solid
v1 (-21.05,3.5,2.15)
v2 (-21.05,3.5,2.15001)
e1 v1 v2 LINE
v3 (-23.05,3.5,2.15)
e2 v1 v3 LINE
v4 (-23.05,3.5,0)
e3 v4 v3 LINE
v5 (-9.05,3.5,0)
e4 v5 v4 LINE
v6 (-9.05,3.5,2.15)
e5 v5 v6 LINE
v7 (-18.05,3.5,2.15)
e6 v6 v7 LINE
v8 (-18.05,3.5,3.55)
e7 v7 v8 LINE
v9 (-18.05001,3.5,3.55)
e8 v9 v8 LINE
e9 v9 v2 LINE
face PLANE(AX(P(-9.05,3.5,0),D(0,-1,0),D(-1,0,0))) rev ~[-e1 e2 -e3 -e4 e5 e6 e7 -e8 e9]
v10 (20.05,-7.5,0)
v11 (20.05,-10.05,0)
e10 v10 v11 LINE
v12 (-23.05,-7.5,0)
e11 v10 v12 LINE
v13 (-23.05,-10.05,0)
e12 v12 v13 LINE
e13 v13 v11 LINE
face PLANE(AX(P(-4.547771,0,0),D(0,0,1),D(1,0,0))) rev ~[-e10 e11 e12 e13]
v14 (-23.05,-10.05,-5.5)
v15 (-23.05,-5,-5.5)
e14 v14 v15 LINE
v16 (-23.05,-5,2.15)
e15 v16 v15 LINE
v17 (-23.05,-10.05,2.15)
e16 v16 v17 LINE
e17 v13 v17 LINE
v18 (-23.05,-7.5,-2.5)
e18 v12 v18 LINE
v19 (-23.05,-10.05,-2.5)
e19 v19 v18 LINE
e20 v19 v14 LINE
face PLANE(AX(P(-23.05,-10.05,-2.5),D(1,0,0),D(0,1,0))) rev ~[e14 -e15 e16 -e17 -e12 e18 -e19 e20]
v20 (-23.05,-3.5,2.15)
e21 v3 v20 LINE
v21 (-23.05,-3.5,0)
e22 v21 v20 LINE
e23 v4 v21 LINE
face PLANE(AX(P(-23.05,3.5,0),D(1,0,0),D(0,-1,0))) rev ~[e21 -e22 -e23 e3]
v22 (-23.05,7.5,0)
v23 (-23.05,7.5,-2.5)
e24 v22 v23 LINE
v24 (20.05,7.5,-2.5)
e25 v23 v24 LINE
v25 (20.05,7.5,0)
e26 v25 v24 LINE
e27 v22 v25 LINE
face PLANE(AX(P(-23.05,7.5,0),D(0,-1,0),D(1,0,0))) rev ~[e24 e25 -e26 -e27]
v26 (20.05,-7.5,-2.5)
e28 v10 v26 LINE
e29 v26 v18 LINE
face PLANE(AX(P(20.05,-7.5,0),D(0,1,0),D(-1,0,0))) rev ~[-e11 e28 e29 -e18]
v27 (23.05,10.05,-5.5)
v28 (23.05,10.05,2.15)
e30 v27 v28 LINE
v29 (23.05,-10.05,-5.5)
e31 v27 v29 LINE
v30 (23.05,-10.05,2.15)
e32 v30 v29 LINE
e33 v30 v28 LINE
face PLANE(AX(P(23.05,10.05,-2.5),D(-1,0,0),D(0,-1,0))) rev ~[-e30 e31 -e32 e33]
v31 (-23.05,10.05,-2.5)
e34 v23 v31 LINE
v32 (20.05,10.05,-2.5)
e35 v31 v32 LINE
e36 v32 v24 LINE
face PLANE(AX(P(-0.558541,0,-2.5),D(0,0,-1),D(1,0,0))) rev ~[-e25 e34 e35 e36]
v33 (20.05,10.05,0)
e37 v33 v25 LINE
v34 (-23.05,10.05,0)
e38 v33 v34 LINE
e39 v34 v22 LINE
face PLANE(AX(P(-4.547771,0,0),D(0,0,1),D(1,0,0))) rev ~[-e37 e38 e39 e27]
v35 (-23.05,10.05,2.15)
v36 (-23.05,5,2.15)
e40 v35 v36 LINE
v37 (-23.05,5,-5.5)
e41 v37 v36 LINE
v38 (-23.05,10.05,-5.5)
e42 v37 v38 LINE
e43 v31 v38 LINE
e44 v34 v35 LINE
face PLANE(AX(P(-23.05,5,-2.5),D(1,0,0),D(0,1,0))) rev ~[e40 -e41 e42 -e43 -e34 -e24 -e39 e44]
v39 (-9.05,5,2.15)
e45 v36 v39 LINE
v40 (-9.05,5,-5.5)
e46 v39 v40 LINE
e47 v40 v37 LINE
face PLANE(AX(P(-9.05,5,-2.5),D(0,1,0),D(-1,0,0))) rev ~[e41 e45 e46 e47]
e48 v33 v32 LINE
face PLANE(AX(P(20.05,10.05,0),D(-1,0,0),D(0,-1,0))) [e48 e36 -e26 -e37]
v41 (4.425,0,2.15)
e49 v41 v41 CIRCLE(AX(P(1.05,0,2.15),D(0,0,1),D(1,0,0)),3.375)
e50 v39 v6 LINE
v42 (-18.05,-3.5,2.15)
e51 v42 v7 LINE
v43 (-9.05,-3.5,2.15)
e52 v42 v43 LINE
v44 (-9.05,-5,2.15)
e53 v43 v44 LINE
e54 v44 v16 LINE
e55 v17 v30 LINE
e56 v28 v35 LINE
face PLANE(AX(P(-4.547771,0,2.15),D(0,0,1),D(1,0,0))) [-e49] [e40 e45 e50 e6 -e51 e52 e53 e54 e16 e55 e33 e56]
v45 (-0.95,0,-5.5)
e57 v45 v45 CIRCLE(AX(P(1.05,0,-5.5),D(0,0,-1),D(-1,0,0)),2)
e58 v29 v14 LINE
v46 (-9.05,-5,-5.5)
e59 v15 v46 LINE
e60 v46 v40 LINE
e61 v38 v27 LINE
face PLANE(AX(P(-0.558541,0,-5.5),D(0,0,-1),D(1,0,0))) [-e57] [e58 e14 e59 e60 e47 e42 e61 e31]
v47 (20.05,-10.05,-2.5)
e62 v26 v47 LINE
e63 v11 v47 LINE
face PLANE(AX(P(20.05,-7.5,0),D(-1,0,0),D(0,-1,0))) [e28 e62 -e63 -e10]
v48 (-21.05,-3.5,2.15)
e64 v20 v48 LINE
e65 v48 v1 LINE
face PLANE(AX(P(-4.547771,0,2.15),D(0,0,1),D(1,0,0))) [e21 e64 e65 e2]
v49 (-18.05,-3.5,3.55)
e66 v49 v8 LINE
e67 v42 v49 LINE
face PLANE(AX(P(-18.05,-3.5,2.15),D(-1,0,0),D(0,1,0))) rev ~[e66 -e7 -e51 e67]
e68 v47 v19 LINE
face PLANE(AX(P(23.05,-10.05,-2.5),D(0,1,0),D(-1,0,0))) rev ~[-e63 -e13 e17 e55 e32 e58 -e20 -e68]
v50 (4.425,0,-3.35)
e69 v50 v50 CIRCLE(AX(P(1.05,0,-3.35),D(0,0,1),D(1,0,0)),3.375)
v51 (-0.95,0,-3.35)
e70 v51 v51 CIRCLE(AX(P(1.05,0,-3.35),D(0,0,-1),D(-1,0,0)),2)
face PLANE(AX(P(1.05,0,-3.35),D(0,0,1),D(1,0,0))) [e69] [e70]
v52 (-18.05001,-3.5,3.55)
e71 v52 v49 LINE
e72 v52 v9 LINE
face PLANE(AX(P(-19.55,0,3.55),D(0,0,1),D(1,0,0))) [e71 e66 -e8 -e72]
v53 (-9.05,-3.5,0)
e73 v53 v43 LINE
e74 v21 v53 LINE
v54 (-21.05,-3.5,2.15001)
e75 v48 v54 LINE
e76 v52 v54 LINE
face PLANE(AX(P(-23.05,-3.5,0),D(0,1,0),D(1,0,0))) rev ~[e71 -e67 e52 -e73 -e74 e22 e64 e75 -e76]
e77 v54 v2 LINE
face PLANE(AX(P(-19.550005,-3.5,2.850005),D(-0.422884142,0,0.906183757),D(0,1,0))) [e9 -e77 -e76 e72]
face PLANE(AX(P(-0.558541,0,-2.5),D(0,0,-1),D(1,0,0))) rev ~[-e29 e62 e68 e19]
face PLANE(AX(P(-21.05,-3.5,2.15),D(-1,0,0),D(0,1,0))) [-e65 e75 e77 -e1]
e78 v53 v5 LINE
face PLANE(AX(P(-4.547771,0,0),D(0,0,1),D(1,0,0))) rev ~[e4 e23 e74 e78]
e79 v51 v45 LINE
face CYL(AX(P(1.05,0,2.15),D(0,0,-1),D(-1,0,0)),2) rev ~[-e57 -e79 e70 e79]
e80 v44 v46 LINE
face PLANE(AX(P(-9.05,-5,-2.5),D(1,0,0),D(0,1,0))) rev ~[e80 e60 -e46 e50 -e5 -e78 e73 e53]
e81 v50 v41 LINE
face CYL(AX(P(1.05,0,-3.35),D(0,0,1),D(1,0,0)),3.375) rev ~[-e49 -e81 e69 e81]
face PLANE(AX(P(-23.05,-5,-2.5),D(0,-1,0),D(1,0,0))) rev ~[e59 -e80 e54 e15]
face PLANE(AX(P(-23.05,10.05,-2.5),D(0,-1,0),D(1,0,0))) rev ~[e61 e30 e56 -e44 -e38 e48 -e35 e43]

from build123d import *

# Parameters (mm, degrees)
F2_DEPTH        = 2.15
F3_W            = 3
F3_H            = 7
F4_DEPTH        = 1.4
F5_SIZE2        = 1.39999
F5_SIZE         = 2.99999
F6_W            = 3
F6_H            = 2.55
F7_DEPTH        = 2.5
F8_W            = 43.1
F8_H            = 2.55
F9_DEPTH        = 3
F11_D           = 4
F11_CBORE_D     = 6.75
F11_CBORE_DEPTH = 5.5


# Not quite as in the source:
# - a fillet or chamfer is up to 0.001 mm smaller than in the source, because OpenCascade refuses the exact size


with BuildPart() as f2:
    # F1 (on Top) → F2 (new body)
    with BuildSketch(Plane.XY):
        Polygon((-23.05, -5), (-23.05, -10.05), (23.05, -10.05), (23.05, 10.05), (-23.05, 10.05), (-23.05, 5), (-9.05, 5), (-9.05, 3.5), (-23.05, 3.5), (-23.05, -3.5), (-9.05, -3.5), (-9.05, -5), align=None)
    extrude(amount=F2_DEPTH)

    # F3 (on face) → F4 (join)
    with BuildSketch(Plane.XY.offset(2.15)):
        with Locations((-19.55, 0)):
            Rectangle(F3_W, F3_H)
    extrude(amount=F4_DEPTH)

    # F5 (size 3 and 1.4 in the source; OpenCascade refuses exactly that, so slightly less here)
    f5_edges = [f2.edges().sort_by_distance(p)[0] for p in [
        (-21.05, 0, 3.55),
    ]]
    f5_side = f2.faces().sort_by_distance((-19.55, 0, 3.55))[0]
    chamfer(f5_edges, length=F5_SIZE, length2=F5_SIZE2, reference=f5_side)

    # F6 (on face) → F7 (join)
    with BuildSketch(Plane(origin=(0, 0, 0), x_dir=(1, 0, 0), z_dir=(0, 0, -1))):
        Polygon((-23.05, -5), (-23.05, -7.5), (20.05, -7.5), (23.05, -7.5), (23.05, 7.5), (20.05, 7.5), (-23.05, 7.5), (-23.05, 5), (-9.05, 5), (-9.05, 3.5), (-9.05, -3.5), (-9.05, -5), align=None)
        with Locations((21.55, 8.775)):
            Rectangle(F6_W, F6_H)
        with Locations((21.55, -8.775)):
            Rectangle(F6_W, F6_H)
    extrude(amount=F7_DEPTH)

    # F8 (on face) → F9 (join)
    with BuildSketch(Plane(origin=(0, 0, -2.5), x_dir=(1, 0, 0), z_dir=(0, 0, -1))):
        Polygon((23.05, -10.05), (23.05, 10.05), (20.05, 10.05), (20.05, 7.5), (-23.05, 7.5), (-23.05, 5), (-9.05, 5), (-9.05, -5), (-23.05, -5), (-23.05, -7.5), (20.05, -7.5), (20.05, -10.05), align=None)
        with Locations((-1.5, -8.775)):
            Rectangle(F8_W, F8_H)
        with Locations((-1.5, 8.775)):
            Rectangle(F8_W, F8_H)
    extrude(amount=F9_DEPTH)

    # F11 (through all)
    with Locations(Plane.XY.offset(2.15)):
        with Locations((1.05, 0)):
            CounterBoreHole(F11_D / 2, F11_CBORE_D / 2, F11_CBORE_DEPTH)


solid = f2.part
